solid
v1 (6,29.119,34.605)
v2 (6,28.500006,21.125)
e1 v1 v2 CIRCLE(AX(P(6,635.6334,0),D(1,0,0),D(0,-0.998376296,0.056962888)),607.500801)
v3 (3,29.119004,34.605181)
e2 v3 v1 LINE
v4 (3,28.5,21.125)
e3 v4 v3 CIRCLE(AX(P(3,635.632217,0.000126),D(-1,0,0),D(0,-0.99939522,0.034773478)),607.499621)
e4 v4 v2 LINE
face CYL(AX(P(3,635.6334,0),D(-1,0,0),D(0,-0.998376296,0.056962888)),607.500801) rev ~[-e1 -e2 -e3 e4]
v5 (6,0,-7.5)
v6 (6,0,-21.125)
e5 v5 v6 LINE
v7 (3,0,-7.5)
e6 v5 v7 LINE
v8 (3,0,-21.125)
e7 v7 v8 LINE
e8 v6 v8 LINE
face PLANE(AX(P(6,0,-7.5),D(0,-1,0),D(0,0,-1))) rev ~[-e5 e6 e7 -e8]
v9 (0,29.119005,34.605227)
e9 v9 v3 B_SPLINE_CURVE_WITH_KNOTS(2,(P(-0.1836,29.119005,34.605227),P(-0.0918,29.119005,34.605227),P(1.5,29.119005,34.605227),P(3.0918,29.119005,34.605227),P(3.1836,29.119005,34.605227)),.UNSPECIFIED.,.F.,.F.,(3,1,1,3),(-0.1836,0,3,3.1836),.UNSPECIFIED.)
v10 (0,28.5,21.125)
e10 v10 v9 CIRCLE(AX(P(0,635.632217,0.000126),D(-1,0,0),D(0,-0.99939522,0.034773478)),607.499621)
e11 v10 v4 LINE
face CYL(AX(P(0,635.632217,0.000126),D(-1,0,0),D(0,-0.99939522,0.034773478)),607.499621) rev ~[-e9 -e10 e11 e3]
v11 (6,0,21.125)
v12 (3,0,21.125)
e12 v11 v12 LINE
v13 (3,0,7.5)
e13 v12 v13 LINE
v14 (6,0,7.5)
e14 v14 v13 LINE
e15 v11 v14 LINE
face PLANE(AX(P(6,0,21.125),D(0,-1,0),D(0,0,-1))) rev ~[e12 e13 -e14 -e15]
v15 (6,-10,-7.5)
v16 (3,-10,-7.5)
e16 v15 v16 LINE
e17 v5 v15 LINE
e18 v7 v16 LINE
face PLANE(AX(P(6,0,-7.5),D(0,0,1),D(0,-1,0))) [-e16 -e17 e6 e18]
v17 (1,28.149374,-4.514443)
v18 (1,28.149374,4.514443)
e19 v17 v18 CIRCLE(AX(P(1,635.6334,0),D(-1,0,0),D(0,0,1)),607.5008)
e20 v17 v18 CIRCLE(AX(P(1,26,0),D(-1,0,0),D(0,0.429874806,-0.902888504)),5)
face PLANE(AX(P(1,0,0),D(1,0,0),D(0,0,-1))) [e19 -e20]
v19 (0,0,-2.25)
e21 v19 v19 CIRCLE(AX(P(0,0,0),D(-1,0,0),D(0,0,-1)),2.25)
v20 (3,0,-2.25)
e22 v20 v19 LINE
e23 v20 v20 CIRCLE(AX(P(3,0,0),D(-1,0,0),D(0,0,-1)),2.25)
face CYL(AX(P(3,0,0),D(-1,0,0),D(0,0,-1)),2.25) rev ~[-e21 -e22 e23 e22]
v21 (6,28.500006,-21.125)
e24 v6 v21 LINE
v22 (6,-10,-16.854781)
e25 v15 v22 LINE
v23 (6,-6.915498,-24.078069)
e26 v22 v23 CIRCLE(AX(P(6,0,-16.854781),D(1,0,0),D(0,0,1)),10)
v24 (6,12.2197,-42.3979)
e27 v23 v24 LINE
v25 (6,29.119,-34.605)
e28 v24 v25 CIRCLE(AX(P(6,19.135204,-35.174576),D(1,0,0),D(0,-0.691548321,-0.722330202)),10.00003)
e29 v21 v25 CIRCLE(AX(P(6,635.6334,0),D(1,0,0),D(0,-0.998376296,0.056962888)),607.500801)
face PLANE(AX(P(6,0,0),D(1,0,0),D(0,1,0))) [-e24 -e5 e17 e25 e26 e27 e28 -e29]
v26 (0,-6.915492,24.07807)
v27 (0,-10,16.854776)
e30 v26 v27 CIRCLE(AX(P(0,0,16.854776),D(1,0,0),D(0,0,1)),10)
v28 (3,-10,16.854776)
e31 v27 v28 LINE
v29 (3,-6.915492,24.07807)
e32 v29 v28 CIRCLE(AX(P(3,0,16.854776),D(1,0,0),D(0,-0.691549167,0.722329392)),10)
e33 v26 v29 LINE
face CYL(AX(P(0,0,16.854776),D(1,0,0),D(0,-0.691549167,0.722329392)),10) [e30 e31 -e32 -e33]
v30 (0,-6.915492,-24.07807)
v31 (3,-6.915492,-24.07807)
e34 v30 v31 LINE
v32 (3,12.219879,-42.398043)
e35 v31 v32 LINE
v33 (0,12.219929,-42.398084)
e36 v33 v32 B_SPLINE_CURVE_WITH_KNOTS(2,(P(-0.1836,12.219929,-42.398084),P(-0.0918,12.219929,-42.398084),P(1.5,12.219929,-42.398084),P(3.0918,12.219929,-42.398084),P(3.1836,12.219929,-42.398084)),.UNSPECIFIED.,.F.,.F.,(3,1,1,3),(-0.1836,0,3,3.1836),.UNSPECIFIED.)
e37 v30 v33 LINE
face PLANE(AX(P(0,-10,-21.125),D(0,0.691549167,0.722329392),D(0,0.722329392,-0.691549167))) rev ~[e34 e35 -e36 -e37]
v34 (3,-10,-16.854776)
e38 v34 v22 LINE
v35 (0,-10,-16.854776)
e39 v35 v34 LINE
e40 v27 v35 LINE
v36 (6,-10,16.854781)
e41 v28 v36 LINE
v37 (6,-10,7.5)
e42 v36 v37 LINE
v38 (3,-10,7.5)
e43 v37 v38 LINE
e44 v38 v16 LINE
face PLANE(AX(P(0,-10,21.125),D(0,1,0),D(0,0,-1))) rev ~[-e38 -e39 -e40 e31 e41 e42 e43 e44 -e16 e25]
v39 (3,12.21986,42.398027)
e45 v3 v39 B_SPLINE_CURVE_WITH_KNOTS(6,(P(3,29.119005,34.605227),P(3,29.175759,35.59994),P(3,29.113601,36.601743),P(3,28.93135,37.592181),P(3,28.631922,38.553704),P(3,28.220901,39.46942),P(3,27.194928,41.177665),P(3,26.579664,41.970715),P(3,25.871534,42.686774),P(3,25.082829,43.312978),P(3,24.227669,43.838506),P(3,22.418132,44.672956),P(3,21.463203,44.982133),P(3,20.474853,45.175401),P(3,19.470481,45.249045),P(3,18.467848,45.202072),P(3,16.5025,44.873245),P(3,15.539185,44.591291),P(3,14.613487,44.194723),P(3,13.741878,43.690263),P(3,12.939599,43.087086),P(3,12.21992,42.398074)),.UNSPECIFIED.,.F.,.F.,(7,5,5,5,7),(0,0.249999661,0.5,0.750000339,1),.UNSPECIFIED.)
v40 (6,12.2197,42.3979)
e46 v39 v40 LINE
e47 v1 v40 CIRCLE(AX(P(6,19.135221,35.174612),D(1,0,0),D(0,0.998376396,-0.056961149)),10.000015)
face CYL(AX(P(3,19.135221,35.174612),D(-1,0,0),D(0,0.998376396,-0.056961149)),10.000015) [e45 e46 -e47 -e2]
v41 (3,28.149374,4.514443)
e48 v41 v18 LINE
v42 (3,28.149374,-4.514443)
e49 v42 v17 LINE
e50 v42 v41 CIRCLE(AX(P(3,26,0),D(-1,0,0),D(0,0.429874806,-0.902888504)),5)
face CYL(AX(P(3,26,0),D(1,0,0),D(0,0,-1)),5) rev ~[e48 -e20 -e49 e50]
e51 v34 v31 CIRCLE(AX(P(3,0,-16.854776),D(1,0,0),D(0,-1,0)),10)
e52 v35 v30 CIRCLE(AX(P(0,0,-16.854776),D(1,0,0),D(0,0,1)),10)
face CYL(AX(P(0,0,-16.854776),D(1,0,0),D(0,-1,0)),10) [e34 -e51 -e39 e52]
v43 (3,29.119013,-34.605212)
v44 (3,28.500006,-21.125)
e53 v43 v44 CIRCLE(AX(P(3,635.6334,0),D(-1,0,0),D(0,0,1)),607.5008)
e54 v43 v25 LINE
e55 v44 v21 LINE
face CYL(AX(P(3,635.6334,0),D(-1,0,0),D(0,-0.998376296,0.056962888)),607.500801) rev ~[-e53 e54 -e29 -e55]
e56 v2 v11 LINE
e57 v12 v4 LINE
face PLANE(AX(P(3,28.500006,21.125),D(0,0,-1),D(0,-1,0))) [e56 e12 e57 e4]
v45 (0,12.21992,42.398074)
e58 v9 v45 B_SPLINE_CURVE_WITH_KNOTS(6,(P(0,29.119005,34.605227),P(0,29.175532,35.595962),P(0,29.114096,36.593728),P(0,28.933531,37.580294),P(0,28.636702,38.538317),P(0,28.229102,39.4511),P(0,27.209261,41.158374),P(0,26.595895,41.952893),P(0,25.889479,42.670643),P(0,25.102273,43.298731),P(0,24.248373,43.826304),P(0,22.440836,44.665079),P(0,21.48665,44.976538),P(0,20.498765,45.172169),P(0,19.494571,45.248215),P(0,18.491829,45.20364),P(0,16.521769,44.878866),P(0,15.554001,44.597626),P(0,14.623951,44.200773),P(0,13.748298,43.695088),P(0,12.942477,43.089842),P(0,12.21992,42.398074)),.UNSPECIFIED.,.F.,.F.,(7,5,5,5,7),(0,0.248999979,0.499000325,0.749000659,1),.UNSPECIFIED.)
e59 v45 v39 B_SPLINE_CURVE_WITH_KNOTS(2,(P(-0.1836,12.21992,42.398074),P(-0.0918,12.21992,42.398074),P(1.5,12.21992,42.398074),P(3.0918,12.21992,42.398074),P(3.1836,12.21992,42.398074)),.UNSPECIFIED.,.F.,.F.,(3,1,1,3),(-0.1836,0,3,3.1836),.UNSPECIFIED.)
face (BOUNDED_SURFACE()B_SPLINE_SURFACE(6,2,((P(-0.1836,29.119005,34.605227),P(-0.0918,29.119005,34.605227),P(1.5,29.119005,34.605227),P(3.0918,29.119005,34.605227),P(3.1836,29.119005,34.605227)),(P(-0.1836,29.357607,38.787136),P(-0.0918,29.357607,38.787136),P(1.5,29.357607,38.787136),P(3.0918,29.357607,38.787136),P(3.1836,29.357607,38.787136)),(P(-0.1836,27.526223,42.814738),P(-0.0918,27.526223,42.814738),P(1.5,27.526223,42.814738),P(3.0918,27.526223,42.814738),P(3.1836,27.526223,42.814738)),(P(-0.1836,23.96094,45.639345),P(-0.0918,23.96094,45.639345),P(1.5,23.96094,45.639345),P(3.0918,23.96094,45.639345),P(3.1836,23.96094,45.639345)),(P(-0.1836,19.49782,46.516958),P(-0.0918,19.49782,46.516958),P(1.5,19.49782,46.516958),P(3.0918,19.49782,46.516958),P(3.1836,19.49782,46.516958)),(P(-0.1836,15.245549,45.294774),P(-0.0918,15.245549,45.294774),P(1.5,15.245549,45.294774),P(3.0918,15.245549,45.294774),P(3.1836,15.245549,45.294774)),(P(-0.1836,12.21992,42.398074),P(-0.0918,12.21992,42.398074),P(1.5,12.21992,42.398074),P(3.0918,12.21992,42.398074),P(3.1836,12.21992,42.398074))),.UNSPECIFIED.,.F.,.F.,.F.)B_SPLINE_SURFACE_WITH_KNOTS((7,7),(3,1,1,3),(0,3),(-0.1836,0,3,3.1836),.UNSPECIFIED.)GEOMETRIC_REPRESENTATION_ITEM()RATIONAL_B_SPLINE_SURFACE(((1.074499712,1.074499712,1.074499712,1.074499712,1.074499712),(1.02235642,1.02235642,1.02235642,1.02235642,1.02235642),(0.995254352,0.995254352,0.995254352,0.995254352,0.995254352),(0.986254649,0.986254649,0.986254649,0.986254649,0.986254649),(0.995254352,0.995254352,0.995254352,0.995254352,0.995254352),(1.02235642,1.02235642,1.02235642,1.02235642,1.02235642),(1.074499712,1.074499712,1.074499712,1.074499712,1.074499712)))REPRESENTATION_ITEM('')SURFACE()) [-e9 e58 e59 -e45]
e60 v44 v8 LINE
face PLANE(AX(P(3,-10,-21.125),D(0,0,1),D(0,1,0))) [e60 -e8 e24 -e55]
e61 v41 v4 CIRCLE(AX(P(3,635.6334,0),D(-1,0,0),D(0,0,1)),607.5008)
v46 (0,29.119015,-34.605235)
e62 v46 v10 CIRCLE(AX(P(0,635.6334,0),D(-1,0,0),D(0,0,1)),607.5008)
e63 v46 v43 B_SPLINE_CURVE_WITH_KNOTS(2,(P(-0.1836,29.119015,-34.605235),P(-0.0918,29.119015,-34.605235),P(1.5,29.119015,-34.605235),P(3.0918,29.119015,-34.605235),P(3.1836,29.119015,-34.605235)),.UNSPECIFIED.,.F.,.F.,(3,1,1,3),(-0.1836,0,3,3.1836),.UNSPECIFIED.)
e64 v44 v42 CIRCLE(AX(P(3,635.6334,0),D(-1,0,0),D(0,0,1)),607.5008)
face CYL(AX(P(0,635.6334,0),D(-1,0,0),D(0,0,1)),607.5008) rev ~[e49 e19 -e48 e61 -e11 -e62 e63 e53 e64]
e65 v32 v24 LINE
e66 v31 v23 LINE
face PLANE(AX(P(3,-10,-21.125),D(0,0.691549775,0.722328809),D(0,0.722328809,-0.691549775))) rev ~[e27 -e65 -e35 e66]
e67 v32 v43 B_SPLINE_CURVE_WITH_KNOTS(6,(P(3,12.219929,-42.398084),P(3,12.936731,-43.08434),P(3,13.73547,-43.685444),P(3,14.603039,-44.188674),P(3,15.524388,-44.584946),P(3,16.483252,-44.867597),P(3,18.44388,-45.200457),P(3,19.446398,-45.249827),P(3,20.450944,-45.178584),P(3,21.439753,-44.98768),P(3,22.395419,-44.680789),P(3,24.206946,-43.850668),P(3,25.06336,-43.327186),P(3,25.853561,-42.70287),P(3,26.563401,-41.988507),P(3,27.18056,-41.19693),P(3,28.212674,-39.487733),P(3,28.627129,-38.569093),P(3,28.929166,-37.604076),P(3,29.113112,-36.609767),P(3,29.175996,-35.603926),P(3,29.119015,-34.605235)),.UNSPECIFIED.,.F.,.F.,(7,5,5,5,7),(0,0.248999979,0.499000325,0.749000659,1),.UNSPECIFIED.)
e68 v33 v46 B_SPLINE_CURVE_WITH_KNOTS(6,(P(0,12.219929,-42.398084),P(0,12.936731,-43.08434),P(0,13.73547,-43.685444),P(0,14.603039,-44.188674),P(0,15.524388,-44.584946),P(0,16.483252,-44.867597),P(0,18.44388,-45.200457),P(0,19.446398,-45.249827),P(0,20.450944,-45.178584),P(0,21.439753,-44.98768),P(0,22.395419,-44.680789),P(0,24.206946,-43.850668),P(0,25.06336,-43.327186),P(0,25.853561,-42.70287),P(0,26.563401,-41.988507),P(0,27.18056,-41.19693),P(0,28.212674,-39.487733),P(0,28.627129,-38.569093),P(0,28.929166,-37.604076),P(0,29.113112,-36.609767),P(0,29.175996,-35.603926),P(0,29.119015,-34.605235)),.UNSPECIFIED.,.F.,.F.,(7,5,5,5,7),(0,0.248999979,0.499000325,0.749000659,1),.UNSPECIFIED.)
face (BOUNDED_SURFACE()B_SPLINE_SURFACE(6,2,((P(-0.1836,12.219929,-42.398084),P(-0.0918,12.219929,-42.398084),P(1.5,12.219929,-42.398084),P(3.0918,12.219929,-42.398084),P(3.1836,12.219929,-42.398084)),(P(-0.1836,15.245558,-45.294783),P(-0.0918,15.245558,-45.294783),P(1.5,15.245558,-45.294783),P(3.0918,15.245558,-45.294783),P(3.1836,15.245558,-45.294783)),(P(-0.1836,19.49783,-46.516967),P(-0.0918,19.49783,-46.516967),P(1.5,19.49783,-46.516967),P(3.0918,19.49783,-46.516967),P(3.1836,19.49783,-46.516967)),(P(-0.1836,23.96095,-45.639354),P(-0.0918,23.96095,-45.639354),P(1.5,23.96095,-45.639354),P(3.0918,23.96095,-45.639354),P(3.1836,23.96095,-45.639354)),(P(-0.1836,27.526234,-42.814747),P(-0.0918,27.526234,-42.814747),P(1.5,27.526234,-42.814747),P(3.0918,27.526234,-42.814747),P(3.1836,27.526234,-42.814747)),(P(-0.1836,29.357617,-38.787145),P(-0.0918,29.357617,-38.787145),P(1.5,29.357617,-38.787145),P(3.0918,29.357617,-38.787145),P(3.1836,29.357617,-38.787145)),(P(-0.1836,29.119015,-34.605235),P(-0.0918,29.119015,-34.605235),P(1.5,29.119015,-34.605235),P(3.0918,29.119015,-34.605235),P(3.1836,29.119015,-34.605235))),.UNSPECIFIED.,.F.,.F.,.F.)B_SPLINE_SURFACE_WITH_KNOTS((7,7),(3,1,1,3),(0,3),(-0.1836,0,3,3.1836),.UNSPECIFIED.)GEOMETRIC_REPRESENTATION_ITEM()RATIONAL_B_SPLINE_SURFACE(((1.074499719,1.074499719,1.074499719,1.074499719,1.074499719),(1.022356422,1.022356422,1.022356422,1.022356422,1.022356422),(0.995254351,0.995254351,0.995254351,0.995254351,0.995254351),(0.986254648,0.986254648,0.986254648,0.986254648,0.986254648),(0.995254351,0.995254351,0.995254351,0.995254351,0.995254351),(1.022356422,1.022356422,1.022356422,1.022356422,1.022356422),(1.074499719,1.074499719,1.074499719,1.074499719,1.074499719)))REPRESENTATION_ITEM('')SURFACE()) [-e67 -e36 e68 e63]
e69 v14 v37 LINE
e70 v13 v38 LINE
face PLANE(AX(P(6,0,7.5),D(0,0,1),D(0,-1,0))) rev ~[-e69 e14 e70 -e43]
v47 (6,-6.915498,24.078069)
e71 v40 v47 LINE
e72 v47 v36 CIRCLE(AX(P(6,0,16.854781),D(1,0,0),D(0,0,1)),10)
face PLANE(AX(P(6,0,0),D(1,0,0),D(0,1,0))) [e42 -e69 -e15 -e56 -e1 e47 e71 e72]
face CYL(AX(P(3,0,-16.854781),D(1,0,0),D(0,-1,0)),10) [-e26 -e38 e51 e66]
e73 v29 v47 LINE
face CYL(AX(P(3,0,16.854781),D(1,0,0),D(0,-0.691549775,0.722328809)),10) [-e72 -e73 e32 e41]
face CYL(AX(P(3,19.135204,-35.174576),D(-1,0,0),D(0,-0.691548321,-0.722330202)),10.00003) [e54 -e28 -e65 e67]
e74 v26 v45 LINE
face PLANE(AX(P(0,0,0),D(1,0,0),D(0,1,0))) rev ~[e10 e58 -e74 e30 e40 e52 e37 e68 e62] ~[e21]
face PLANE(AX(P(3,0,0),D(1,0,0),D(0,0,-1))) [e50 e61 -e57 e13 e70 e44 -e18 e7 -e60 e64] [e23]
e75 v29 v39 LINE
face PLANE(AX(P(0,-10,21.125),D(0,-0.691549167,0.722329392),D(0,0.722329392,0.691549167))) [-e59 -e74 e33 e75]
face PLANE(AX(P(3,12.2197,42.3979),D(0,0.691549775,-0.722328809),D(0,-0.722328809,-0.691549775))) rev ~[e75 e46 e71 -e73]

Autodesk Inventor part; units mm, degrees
ref_plane "YZ Plane" through (0, 0, 0) normal (1, 0, 0) x (0, 1, 0)
ref_plane "XZ Plane" through (0, 0, 0) normal (0, 1, 0) x (-1, 0, 0)
ref_plane "XY Plane" through (0, 0, 0) normal (0, 0, 1) x (1, 0, 0)
sketch "Sketch1" plane through (0, 0, 0) normal (1, 0, 0) x (0, 1, 0)
  line L0 (10, 21.125) -> (-10, 21.125)
  line L1 (-10, 21.125) -> (-10, -21.125)
  line L2 (-10, -21.125) -> (10, -21.125)
  line L3 (10, -21.125) -> (10, 21.125)
  line L4 (10, 21.125) -> (-10, -21.125) construction
  line L5 (-10, 21.125) -> (10, -21.125) construction
  point P0 (0, 0)
  dimension "d0" = 42.25
  dimension "d1" = 20
extrude "Extrusion1" add sketch "Sketch1" along normal blind 6
sketch "Sketch2" plane through (6, 0, 0) normal (1, 0, 0) x (0, 0, -1)
  line L0 (-21.125, 0) -> (-7.5, 0)
  line L1 (-7.5, 0) -> (-7.5, -10)
  line L2 (-21.125, -10) -> (21.125, -10) projected
  line L3 (7.5, 0) -> (21.125, 0)
  line L4 (21.125, -10) -> (21.125, 10) projected
  line L5 (7.5, 0) -> (7.5, -10.6285)
  line L6 (-21.125, -10) -> (21.125, -10) projected
  line L7 (21.125, -10) -> (21.125, 10) projected
  line L8 (21.125, 10) -> (-21.125, 10) projected
  line L9 (-21.125, 10) -> (-21.125, -10) projected
  point P0 (0, 0)
  point P1 (0, -10)
  point P2 (-21.125, 0)
  point P3 (7.5, -10)
  dimension "d4" = 15
  dimension "d6" = 10
  dimension "d7" = 7.5
extrude "Extrusion2" cut sketch "Sketch2" against normal blind 3 contours L9 L8 L4 L3 L5 L2 L1 L0
sketch "Sketch4" plane through (0, 0, 0) normal (-1, 0, 0) x (0, 0, 1)
  arc A0 (21.125, 28.5) -> (190.4596, 58.7605) centre (0, 635.6334) ccw projected
  circle A1 centre (0, 635.6334) radius 607.5008
  circle A2 centre (0, 635.6334) radius 607.5008
  circle A3 centre (0, 635.6334) radius 617.5008
  line L0 (21.125, 0) -> (21.125, -10) projected
  line L1 (21.125, -10) -> (50, 20.1602)
  line L2 (-7.5, -10) -> (-21.125, -10) projected
  line L3 (-21.125, -10) -> (-50, 20.1602)
  line L4 (-50, 20.1602) -> (-50, 30.1937)
  line L5 (50, 20.1602) -> (50, 30.1937)
  line L6 (21.125, -10) -> (-21.125, -10) projected
  point P0 (0, 0)
  dimension "d17" = 0
  dimension "d18" = 10
  dimension "d19" = 100
extrude "Extrusion3" add sketch "Sketch4" against normal blind 3 contours A0 L5 A3 L4 A1 | L1 L6 L2 L3 A3 picked at (-31.0009, 22.4071)
fillet "Fillet1" radius 10 4 edges at (1.5, 20.1602, 50) (1.5, 20.1602, -50) (1.5, 30.1937, -50) (1.5, 30.1937, 50)
sketch "Sketch3" plane through (3, 0, 0) normal (1, 0, 0) x (0, 0, -1)
  point P0 (0, 0)
  point P1 (0, 0)
  point P2 (7.5, 0)
hole "Hole1" at (3, 0, 0) direction (-1, 0, 0) diameter 4.5 end through all
sketch "Sketch5" plane through (3, 0, 0) normal (1, 0, 0) x (0, 0, -1)
  line L0 (-21.125, -10) -> (-7.5, -10) projected
  line L1 (-21.125, -10) -> (21.125, -10)
  line L2 (21.125, -10) -> (21.125, 40)
  line L3 (21.125, 40) -> (-21.125, 40)
  line L4 (-21.125, 40) -> (-21.125, -10)
  arc A0 (-34.605, 29.119) -> (-42.3979, 12.2197) centre (-35.1746, 19.1352) ccw projected
  line L5 (-42.3979, 12.2197) -> (-21.125, -10) projected
  line L6 (-21.125, 0) -> (-21.125, -10) projected
  line L7 (-7.5, 0) -> (-21.125, 0) projected
  line L8 (-7.5, -10) -> (-7.5, 0) projected
  line L9 (7.5, -10) -> (-7.5, -10) projected
  line L10 (7.5, 0) -> (7.5, -10) projected
  line L11 (21.125, 0) -> (7.5, 0) projected
  line L12 (21.125, -10) -> (21.125, 0) projected
  line L13 (21.125, -10) -> (42.3979, 12.2197) projected
  arc A1 (42.3979, 12.2197) -> (34.605, 29.119) centre (35.1746, 19.1352) ccw projected
  arc A2 (-34.605, 29.119) -> (34.605, 29.119) centre (0, 635.6334) ccw projected
  circle A3 centre (0, 0) radius 2.25 projected
  point P0 (21.125, 28.5)
  point P1 (-21.125, 28.5)
  dimension "d26" = 50
extrude "Extrusion4" add sketch "Sketch5" along normal up to surface (3 mm away) contours L5 A0 A2 L4 | L2 A2 A1 L13
sketch "Sketch6" plane through (3, 0, 0) normal (1, 0, 0) x (0, 0, -1)
  circle A0 centre (0, 26) radius 5
  point P0 (0, 0)
  dimension "d27" = 26
  dimension "d28" = 10
extrude "Extrusion5" cut sketch "Sketch6" against normal blind 2
fillet "Fillet2" radius 10 2 edges at (3, -10, -21.125) (3, -10, 21.125)
equation "\"d7\" = 0.5 * d4"
properties part number "base_cover_3DPrint"
